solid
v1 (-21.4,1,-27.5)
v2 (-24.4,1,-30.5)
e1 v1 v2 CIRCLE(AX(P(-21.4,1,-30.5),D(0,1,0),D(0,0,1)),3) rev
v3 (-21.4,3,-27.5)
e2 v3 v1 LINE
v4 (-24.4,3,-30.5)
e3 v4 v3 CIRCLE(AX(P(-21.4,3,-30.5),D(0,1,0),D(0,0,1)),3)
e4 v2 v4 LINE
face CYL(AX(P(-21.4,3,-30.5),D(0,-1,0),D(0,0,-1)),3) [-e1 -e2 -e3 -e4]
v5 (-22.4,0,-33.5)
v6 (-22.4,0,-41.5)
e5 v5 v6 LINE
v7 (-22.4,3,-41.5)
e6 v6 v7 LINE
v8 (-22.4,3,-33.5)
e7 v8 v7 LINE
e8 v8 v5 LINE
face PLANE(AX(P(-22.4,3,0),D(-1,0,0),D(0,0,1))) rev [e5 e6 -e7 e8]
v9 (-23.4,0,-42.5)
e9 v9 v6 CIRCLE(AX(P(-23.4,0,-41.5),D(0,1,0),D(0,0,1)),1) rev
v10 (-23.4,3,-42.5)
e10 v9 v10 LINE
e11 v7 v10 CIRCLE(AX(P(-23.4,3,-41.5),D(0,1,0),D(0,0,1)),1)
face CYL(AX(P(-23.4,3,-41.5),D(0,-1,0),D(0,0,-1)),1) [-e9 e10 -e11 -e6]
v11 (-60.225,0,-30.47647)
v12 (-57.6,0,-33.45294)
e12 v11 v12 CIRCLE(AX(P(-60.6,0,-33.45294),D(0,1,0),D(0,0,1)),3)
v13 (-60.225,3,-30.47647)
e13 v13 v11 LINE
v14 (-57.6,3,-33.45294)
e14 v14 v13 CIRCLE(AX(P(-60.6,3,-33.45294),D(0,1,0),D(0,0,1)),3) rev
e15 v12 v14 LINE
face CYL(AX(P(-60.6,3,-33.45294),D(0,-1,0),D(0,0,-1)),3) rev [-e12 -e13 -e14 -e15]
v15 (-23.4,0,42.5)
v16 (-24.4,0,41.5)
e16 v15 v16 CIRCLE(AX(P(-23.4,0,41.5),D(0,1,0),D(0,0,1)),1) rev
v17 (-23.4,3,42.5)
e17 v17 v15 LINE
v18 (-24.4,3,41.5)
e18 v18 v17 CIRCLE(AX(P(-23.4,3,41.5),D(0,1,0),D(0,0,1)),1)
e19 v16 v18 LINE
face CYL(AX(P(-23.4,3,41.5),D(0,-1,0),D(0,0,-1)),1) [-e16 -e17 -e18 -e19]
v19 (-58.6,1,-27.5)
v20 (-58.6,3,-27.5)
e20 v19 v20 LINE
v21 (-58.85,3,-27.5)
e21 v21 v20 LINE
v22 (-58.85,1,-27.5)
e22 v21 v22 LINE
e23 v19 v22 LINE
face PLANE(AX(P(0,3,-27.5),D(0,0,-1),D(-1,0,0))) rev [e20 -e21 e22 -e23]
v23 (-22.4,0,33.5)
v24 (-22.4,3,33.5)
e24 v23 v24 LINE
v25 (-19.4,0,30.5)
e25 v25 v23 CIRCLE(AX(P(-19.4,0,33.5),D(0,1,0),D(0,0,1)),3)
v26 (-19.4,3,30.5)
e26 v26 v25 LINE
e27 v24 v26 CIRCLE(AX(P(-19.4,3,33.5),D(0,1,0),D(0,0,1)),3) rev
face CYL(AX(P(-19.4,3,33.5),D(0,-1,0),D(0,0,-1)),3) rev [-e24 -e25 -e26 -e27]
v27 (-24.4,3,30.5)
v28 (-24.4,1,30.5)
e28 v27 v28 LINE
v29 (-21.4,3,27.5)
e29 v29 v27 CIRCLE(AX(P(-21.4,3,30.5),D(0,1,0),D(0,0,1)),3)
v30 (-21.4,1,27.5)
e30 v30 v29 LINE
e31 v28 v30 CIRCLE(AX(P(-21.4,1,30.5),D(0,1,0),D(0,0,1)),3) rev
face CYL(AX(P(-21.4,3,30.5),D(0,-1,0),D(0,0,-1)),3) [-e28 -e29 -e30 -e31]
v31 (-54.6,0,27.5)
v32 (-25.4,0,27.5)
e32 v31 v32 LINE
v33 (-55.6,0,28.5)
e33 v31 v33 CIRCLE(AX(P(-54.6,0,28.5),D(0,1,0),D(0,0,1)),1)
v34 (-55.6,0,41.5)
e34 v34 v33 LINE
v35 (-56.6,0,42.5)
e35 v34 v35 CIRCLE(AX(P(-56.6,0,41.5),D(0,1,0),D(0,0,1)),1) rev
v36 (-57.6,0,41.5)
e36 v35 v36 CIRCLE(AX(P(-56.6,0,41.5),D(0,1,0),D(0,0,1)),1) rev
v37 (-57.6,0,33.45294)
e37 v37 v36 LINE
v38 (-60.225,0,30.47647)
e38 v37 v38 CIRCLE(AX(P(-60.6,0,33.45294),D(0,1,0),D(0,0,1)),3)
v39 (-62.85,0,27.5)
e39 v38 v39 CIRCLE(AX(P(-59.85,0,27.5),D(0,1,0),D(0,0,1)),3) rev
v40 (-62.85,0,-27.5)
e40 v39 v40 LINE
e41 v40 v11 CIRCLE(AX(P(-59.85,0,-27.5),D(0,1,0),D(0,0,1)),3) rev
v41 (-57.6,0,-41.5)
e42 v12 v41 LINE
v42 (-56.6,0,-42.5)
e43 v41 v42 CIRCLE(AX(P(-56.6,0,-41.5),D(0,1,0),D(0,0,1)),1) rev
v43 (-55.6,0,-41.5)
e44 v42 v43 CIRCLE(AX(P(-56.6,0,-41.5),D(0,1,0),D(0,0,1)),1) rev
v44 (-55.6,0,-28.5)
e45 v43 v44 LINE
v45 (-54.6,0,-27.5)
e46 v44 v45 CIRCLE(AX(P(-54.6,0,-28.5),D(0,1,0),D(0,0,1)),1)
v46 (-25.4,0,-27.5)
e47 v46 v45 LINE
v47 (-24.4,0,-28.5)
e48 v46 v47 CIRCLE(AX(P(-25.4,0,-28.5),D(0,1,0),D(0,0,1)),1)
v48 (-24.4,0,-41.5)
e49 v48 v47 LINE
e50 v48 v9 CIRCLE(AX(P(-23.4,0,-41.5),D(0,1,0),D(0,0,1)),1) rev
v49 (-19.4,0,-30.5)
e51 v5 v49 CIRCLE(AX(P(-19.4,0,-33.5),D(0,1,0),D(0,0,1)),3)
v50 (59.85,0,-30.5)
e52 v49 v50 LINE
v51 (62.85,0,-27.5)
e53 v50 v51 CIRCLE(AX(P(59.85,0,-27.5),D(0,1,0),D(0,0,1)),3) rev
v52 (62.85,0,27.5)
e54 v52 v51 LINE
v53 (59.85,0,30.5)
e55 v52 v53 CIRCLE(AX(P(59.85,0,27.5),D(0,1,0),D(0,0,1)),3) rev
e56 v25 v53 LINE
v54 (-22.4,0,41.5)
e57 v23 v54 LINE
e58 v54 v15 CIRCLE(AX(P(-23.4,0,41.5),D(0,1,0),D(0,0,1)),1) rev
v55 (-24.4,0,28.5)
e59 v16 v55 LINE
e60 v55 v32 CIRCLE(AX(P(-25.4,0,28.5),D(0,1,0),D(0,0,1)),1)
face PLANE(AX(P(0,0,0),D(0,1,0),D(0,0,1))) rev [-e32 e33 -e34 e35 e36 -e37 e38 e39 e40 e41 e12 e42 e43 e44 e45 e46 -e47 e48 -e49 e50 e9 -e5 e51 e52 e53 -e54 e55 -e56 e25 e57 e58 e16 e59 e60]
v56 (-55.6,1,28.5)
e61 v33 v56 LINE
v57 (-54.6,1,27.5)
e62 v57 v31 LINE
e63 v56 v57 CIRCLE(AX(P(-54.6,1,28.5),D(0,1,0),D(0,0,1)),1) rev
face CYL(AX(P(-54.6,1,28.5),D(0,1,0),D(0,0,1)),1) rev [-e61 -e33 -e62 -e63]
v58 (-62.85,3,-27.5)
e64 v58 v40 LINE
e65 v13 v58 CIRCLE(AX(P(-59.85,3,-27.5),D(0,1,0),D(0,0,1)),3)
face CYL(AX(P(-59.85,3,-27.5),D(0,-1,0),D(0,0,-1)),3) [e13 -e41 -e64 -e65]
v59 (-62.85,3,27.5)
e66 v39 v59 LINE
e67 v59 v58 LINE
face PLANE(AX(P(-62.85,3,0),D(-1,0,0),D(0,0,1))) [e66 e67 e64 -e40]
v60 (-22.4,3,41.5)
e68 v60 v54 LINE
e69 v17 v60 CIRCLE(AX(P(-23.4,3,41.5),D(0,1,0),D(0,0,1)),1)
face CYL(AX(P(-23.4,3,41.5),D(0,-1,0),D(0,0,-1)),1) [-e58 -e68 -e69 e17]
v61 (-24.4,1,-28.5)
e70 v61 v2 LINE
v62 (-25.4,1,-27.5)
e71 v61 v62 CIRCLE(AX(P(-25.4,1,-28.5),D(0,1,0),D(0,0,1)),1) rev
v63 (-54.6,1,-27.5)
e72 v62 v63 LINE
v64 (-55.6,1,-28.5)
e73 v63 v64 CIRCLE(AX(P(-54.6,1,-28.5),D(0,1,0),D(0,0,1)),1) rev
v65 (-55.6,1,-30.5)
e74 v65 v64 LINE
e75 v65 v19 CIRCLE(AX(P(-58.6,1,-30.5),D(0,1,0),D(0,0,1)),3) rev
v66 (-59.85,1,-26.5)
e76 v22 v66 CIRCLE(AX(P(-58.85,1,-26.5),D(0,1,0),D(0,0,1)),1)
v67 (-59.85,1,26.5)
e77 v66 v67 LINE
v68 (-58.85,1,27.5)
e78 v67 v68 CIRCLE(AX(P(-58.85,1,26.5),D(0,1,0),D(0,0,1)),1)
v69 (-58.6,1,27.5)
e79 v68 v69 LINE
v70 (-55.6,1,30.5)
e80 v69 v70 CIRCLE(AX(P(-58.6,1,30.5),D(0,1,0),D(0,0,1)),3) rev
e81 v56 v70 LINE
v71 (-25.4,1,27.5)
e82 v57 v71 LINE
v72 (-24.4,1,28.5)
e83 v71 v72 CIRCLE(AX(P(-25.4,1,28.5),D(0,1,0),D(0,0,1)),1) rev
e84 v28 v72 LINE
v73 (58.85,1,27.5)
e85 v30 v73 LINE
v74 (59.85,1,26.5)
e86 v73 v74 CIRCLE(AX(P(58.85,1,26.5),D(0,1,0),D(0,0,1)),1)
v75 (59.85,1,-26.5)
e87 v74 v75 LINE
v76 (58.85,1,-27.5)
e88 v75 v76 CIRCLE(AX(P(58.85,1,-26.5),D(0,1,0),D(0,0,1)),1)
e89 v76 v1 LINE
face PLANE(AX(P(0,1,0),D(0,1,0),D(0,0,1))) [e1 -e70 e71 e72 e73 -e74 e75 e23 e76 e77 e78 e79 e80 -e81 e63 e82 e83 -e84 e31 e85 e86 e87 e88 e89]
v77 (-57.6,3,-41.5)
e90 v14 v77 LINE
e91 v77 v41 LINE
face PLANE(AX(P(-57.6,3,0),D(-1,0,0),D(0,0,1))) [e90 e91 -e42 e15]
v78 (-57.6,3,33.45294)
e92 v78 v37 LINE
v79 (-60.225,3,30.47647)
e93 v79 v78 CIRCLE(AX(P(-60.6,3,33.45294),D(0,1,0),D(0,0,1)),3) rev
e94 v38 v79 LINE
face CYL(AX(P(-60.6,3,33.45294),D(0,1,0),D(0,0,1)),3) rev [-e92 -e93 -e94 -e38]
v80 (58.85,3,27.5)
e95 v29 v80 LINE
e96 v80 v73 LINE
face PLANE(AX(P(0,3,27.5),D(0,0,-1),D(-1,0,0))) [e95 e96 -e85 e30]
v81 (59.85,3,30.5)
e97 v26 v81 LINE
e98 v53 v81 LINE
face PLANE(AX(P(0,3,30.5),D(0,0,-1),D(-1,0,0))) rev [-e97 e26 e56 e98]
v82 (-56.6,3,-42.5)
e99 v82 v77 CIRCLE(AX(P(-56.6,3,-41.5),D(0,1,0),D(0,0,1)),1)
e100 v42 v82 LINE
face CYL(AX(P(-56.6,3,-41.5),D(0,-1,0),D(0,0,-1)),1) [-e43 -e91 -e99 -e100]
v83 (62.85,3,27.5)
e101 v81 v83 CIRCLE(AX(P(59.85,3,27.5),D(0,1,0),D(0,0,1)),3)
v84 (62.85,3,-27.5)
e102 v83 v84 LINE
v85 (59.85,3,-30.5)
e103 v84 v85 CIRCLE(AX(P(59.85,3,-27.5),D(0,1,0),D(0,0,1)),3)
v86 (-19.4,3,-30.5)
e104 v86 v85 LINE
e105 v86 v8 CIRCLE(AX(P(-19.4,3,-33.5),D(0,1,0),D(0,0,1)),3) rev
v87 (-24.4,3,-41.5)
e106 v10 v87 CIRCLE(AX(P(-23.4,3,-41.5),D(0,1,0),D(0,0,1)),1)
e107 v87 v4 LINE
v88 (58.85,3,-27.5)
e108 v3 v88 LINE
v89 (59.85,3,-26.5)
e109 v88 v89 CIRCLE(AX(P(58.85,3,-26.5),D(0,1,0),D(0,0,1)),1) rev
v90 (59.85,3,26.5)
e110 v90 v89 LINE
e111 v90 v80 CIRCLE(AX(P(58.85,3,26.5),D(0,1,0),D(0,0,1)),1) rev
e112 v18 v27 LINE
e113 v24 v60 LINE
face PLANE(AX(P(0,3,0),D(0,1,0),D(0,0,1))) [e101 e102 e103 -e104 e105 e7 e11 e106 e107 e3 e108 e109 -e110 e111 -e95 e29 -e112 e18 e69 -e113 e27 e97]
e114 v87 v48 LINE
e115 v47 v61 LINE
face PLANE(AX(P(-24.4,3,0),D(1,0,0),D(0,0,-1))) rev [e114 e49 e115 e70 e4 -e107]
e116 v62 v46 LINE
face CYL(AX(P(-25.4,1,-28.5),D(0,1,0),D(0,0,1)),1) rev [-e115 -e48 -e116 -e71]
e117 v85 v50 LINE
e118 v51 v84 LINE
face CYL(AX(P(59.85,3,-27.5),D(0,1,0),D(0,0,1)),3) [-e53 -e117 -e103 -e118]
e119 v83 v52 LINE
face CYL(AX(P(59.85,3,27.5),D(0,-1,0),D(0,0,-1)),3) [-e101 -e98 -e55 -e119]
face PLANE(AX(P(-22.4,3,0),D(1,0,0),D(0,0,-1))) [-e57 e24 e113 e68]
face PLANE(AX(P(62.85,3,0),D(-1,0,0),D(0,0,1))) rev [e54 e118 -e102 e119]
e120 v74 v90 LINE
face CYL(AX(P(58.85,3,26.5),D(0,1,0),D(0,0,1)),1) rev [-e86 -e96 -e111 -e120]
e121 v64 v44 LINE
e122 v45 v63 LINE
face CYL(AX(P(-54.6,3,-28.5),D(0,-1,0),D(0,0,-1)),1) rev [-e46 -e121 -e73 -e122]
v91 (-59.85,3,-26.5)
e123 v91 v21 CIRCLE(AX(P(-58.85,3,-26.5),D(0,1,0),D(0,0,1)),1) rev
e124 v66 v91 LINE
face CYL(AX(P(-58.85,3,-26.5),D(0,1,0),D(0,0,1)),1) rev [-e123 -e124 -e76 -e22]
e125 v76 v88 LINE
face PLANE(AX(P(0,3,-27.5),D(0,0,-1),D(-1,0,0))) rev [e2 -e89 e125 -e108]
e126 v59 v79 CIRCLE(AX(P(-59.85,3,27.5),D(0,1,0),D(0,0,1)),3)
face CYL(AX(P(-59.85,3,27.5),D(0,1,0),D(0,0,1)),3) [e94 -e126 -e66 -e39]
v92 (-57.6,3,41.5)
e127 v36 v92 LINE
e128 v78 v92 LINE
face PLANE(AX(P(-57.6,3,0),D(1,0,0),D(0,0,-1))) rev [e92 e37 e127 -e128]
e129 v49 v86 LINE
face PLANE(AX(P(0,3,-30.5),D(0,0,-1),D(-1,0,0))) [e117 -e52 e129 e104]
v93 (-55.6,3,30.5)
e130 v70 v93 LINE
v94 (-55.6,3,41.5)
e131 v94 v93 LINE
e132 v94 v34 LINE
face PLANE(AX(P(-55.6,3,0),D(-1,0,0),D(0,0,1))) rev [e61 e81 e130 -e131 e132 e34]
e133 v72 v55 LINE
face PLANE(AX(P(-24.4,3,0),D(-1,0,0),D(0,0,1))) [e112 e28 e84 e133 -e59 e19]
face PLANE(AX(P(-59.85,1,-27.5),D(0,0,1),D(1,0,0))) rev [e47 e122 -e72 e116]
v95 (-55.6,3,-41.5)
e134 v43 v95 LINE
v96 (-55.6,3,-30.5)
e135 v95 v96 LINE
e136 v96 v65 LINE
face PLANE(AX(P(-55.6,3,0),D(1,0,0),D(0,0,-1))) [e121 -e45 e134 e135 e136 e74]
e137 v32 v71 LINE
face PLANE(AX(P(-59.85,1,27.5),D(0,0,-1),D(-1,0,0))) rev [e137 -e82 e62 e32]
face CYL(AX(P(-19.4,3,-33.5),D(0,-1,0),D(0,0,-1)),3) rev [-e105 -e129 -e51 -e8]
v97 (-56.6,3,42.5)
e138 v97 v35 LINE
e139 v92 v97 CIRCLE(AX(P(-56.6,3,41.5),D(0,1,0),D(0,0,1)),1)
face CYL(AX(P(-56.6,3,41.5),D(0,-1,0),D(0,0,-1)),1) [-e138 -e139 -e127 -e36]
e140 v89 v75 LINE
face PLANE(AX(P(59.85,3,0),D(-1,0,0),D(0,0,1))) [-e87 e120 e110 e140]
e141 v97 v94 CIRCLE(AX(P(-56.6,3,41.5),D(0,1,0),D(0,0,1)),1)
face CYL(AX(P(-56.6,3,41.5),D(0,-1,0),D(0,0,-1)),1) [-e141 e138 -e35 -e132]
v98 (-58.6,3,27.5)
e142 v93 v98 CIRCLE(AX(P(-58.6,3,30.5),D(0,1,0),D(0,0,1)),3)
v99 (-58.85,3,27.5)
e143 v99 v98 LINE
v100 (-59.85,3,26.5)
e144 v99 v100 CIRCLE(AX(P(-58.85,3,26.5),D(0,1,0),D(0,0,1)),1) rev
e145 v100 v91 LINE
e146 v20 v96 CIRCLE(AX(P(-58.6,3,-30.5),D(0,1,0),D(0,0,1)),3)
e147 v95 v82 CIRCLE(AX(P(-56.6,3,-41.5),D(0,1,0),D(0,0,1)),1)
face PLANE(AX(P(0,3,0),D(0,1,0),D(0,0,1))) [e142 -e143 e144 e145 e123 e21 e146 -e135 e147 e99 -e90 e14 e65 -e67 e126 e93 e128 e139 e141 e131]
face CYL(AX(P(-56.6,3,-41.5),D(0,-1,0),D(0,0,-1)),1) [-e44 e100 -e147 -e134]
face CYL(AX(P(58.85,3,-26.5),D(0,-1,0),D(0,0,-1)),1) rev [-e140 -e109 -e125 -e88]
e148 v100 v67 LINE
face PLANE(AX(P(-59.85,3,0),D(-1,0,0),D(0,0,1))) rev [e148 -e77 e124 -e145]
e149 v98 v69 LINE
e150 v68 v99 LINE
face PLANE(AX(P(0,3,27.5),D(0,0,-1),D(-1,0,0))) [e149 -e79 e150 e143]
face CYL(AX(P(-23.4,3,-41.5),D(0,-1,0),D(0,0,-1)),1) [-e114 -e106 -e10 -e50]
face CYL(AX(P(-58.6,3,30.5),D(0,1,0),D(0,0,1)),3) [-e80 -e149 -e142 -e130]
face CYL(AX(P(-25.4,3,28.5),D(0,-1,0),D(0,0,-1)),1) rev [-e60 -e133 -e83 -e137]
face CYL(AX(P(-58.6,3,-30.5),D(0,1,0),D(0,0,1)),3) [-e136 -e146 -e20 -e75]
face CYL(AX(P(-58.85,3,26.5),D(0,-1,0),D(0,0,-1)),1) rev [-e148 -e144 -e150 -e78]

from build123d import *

# Parameters (mm, degrees)
BOSS_EXTRUDE6_DEPTH   = 3
BOSS_EXTRUDE6_2_DEPTH = 3
SKETCH4_W             = 119.7
SKETCH4_H             = 55
BOSS_EXTRUDE7_DEPTH   = 1
FILLET13_R            = 3
FILLET14_R            = 1
FILLET15_R            = 1
FILLET16_R            = 3
FILLET17_R            = 3
FILLET18_R            = 1
FILLET19_R            = 3
FILLET20_R            = 1


with BuildPart() as part:
    # Sketch3 → Boss-Extrude6 (new body)
    with BuildSketch(Plane(origin=(0, 0, 0), x_dir=(1, 0, 0), z_dir=(0, 1, 0))):
        Polygon((-55.6, -27.5), (-59.85, -27.5), (-59.85, 27.5), (-55.6, 27.5), (-55.6, 42.5), (-57.6, 42.5), (-57.6, 30.5), (-62.85, 30.5), (-62.85, -30.5), (-57.6, -30.5), (-57.6, -42.5), (-55.6, -42.5), align=None)
    extrude(amount=BOSS_EXTRUDE6_DEPTH)



with BuildPart() as body_2:
    # Sketch3 → Boss-Extrude6 2 (new body)
    with BuildSketch(Plane(origin=(0, 0, 0), x_dir=(1, 0, 0), z_dir=(0, 1, 0))):
        Polygon((59.85, -27.5), (-24.4, -27.5), (-24.4, -42.5), (-22.4, -42.5), (-22.4, -30.5), (62.85, -30.5), (62.85, 30.5), (-22.4, 30.5), (-22.4, 42.5), (-24.4, 42.5), (-24.4, 27.5), (59.85, 27.5), align=None)
    extrude(amount=BOSS_EXTRUDE6_2_DEPTH)


with BuildPart() as part_1:
    add(part.part)

    add(body_2.part)  # Boss-Extrude7 merges body 2
    # Sketch4 → Boss-Extrude7 (add)
    with BuildSketch(Plane(origin=(0, 0, 0), x_dir=(1, 0, 0), z_dir=(0, 1, 0))):
        Rectangle(SKETCH4_W, SKETCH4_H)
    extrude(amount=BOSS_EXTRUDE7_DEPTH)

    # Fillet13
    fillet13_edges = [part_1.edges().sort_by_distance(p)[0] for p in [
        (-62.85, 1.5, 30.5),
        (-62.85, 1.5, -30.5),
        (62.85, 1.5, 30.5),
        (62.85, 1.5, -30.5),
    ]]
    fillet(fillet13_edges, radius=FILLET13_R)

    # Fillet14
    fillet14_edges = [part_1.edges().sort_by_distance(p)[0] for p in [
        (-59.85, 2, -27.5),
        (-59.85, 2, 27.5),
        (59.85, 2, -27.5),
        (59.85, 2, 27.5),
    ]]
    fillet(fillet14_edges, radius=FILLET14_R)

    # Fillet15
    fillet15_edges = [part_1.edges().sort_by_distance(p)[0] for p in [
        (-22.4, 1.5, 42.5),
        (-24.4, 1.5, 42.5),
        (-55.6, 1.5, 42.5),
        (-57.6, 1.5, 42.5),
        (-55.6, 1.5, -42.5),
        (-57.6, 1.5, -42.5),
        (-22.4, 1.5, -42.5),
        (-24.4, 1.5, -42.5),
    ]]
    fillet(fillet15_edges, radius=FILLET15_R - 0.0001)  # a hair under: the kernel refuses the full size

    # Fillet16
    fillet16_edges = [part_1.edges().sort_by_distance(p)[0] for p in [
        (-22.4, 1.5, -30.5),
        (-57.6, 1.5, -30.5),
        (-57.6, 1.5, 30.5),
        (-22.4, 1.5, 30.5),
    ]]
    fillet(fillet16_edges, radius=FILLET16_R)

    # Fillet17
    fillet17_edges = [part_1.edges().sort_by_distance(p)[0] for p in [
        (-55.6, 2, -27.5),
        (-24.4, 2, -27.5),
    ]]
    fillet(fillet17_edges, radius=FILLET17_R)

    # Fillet18
    fillet18_edges = [part_1.edges().sort_by_distance(p)[0] for p in [
        (-55.6, 0.5, -27.5),
        (-24.4, 0.5, -27.5),
    ]]
    fillet(fillet18_edges, radius=FILLET18_R)

    # Fillet19
    fillet19_edges = [part_1.edges().sort_by_distance(p)[0] for p in [
        (-55.6, 2, 27.5),
        (-24.4, 2, 27.5),
    ]]
    fillet(fillet19_edges, radius=FILLET19_R)

    # Fillet20
    fillet20_edges = [part_1.edges().sort_by_distance(p)[0] for p in [
        (-55.6, 0.5, 27.5),
        (-24.4, 0.5, 27.5),
    ]]
    fillet(fillet20_edges, radius=FILLET20_R)


solid = part_1.part
